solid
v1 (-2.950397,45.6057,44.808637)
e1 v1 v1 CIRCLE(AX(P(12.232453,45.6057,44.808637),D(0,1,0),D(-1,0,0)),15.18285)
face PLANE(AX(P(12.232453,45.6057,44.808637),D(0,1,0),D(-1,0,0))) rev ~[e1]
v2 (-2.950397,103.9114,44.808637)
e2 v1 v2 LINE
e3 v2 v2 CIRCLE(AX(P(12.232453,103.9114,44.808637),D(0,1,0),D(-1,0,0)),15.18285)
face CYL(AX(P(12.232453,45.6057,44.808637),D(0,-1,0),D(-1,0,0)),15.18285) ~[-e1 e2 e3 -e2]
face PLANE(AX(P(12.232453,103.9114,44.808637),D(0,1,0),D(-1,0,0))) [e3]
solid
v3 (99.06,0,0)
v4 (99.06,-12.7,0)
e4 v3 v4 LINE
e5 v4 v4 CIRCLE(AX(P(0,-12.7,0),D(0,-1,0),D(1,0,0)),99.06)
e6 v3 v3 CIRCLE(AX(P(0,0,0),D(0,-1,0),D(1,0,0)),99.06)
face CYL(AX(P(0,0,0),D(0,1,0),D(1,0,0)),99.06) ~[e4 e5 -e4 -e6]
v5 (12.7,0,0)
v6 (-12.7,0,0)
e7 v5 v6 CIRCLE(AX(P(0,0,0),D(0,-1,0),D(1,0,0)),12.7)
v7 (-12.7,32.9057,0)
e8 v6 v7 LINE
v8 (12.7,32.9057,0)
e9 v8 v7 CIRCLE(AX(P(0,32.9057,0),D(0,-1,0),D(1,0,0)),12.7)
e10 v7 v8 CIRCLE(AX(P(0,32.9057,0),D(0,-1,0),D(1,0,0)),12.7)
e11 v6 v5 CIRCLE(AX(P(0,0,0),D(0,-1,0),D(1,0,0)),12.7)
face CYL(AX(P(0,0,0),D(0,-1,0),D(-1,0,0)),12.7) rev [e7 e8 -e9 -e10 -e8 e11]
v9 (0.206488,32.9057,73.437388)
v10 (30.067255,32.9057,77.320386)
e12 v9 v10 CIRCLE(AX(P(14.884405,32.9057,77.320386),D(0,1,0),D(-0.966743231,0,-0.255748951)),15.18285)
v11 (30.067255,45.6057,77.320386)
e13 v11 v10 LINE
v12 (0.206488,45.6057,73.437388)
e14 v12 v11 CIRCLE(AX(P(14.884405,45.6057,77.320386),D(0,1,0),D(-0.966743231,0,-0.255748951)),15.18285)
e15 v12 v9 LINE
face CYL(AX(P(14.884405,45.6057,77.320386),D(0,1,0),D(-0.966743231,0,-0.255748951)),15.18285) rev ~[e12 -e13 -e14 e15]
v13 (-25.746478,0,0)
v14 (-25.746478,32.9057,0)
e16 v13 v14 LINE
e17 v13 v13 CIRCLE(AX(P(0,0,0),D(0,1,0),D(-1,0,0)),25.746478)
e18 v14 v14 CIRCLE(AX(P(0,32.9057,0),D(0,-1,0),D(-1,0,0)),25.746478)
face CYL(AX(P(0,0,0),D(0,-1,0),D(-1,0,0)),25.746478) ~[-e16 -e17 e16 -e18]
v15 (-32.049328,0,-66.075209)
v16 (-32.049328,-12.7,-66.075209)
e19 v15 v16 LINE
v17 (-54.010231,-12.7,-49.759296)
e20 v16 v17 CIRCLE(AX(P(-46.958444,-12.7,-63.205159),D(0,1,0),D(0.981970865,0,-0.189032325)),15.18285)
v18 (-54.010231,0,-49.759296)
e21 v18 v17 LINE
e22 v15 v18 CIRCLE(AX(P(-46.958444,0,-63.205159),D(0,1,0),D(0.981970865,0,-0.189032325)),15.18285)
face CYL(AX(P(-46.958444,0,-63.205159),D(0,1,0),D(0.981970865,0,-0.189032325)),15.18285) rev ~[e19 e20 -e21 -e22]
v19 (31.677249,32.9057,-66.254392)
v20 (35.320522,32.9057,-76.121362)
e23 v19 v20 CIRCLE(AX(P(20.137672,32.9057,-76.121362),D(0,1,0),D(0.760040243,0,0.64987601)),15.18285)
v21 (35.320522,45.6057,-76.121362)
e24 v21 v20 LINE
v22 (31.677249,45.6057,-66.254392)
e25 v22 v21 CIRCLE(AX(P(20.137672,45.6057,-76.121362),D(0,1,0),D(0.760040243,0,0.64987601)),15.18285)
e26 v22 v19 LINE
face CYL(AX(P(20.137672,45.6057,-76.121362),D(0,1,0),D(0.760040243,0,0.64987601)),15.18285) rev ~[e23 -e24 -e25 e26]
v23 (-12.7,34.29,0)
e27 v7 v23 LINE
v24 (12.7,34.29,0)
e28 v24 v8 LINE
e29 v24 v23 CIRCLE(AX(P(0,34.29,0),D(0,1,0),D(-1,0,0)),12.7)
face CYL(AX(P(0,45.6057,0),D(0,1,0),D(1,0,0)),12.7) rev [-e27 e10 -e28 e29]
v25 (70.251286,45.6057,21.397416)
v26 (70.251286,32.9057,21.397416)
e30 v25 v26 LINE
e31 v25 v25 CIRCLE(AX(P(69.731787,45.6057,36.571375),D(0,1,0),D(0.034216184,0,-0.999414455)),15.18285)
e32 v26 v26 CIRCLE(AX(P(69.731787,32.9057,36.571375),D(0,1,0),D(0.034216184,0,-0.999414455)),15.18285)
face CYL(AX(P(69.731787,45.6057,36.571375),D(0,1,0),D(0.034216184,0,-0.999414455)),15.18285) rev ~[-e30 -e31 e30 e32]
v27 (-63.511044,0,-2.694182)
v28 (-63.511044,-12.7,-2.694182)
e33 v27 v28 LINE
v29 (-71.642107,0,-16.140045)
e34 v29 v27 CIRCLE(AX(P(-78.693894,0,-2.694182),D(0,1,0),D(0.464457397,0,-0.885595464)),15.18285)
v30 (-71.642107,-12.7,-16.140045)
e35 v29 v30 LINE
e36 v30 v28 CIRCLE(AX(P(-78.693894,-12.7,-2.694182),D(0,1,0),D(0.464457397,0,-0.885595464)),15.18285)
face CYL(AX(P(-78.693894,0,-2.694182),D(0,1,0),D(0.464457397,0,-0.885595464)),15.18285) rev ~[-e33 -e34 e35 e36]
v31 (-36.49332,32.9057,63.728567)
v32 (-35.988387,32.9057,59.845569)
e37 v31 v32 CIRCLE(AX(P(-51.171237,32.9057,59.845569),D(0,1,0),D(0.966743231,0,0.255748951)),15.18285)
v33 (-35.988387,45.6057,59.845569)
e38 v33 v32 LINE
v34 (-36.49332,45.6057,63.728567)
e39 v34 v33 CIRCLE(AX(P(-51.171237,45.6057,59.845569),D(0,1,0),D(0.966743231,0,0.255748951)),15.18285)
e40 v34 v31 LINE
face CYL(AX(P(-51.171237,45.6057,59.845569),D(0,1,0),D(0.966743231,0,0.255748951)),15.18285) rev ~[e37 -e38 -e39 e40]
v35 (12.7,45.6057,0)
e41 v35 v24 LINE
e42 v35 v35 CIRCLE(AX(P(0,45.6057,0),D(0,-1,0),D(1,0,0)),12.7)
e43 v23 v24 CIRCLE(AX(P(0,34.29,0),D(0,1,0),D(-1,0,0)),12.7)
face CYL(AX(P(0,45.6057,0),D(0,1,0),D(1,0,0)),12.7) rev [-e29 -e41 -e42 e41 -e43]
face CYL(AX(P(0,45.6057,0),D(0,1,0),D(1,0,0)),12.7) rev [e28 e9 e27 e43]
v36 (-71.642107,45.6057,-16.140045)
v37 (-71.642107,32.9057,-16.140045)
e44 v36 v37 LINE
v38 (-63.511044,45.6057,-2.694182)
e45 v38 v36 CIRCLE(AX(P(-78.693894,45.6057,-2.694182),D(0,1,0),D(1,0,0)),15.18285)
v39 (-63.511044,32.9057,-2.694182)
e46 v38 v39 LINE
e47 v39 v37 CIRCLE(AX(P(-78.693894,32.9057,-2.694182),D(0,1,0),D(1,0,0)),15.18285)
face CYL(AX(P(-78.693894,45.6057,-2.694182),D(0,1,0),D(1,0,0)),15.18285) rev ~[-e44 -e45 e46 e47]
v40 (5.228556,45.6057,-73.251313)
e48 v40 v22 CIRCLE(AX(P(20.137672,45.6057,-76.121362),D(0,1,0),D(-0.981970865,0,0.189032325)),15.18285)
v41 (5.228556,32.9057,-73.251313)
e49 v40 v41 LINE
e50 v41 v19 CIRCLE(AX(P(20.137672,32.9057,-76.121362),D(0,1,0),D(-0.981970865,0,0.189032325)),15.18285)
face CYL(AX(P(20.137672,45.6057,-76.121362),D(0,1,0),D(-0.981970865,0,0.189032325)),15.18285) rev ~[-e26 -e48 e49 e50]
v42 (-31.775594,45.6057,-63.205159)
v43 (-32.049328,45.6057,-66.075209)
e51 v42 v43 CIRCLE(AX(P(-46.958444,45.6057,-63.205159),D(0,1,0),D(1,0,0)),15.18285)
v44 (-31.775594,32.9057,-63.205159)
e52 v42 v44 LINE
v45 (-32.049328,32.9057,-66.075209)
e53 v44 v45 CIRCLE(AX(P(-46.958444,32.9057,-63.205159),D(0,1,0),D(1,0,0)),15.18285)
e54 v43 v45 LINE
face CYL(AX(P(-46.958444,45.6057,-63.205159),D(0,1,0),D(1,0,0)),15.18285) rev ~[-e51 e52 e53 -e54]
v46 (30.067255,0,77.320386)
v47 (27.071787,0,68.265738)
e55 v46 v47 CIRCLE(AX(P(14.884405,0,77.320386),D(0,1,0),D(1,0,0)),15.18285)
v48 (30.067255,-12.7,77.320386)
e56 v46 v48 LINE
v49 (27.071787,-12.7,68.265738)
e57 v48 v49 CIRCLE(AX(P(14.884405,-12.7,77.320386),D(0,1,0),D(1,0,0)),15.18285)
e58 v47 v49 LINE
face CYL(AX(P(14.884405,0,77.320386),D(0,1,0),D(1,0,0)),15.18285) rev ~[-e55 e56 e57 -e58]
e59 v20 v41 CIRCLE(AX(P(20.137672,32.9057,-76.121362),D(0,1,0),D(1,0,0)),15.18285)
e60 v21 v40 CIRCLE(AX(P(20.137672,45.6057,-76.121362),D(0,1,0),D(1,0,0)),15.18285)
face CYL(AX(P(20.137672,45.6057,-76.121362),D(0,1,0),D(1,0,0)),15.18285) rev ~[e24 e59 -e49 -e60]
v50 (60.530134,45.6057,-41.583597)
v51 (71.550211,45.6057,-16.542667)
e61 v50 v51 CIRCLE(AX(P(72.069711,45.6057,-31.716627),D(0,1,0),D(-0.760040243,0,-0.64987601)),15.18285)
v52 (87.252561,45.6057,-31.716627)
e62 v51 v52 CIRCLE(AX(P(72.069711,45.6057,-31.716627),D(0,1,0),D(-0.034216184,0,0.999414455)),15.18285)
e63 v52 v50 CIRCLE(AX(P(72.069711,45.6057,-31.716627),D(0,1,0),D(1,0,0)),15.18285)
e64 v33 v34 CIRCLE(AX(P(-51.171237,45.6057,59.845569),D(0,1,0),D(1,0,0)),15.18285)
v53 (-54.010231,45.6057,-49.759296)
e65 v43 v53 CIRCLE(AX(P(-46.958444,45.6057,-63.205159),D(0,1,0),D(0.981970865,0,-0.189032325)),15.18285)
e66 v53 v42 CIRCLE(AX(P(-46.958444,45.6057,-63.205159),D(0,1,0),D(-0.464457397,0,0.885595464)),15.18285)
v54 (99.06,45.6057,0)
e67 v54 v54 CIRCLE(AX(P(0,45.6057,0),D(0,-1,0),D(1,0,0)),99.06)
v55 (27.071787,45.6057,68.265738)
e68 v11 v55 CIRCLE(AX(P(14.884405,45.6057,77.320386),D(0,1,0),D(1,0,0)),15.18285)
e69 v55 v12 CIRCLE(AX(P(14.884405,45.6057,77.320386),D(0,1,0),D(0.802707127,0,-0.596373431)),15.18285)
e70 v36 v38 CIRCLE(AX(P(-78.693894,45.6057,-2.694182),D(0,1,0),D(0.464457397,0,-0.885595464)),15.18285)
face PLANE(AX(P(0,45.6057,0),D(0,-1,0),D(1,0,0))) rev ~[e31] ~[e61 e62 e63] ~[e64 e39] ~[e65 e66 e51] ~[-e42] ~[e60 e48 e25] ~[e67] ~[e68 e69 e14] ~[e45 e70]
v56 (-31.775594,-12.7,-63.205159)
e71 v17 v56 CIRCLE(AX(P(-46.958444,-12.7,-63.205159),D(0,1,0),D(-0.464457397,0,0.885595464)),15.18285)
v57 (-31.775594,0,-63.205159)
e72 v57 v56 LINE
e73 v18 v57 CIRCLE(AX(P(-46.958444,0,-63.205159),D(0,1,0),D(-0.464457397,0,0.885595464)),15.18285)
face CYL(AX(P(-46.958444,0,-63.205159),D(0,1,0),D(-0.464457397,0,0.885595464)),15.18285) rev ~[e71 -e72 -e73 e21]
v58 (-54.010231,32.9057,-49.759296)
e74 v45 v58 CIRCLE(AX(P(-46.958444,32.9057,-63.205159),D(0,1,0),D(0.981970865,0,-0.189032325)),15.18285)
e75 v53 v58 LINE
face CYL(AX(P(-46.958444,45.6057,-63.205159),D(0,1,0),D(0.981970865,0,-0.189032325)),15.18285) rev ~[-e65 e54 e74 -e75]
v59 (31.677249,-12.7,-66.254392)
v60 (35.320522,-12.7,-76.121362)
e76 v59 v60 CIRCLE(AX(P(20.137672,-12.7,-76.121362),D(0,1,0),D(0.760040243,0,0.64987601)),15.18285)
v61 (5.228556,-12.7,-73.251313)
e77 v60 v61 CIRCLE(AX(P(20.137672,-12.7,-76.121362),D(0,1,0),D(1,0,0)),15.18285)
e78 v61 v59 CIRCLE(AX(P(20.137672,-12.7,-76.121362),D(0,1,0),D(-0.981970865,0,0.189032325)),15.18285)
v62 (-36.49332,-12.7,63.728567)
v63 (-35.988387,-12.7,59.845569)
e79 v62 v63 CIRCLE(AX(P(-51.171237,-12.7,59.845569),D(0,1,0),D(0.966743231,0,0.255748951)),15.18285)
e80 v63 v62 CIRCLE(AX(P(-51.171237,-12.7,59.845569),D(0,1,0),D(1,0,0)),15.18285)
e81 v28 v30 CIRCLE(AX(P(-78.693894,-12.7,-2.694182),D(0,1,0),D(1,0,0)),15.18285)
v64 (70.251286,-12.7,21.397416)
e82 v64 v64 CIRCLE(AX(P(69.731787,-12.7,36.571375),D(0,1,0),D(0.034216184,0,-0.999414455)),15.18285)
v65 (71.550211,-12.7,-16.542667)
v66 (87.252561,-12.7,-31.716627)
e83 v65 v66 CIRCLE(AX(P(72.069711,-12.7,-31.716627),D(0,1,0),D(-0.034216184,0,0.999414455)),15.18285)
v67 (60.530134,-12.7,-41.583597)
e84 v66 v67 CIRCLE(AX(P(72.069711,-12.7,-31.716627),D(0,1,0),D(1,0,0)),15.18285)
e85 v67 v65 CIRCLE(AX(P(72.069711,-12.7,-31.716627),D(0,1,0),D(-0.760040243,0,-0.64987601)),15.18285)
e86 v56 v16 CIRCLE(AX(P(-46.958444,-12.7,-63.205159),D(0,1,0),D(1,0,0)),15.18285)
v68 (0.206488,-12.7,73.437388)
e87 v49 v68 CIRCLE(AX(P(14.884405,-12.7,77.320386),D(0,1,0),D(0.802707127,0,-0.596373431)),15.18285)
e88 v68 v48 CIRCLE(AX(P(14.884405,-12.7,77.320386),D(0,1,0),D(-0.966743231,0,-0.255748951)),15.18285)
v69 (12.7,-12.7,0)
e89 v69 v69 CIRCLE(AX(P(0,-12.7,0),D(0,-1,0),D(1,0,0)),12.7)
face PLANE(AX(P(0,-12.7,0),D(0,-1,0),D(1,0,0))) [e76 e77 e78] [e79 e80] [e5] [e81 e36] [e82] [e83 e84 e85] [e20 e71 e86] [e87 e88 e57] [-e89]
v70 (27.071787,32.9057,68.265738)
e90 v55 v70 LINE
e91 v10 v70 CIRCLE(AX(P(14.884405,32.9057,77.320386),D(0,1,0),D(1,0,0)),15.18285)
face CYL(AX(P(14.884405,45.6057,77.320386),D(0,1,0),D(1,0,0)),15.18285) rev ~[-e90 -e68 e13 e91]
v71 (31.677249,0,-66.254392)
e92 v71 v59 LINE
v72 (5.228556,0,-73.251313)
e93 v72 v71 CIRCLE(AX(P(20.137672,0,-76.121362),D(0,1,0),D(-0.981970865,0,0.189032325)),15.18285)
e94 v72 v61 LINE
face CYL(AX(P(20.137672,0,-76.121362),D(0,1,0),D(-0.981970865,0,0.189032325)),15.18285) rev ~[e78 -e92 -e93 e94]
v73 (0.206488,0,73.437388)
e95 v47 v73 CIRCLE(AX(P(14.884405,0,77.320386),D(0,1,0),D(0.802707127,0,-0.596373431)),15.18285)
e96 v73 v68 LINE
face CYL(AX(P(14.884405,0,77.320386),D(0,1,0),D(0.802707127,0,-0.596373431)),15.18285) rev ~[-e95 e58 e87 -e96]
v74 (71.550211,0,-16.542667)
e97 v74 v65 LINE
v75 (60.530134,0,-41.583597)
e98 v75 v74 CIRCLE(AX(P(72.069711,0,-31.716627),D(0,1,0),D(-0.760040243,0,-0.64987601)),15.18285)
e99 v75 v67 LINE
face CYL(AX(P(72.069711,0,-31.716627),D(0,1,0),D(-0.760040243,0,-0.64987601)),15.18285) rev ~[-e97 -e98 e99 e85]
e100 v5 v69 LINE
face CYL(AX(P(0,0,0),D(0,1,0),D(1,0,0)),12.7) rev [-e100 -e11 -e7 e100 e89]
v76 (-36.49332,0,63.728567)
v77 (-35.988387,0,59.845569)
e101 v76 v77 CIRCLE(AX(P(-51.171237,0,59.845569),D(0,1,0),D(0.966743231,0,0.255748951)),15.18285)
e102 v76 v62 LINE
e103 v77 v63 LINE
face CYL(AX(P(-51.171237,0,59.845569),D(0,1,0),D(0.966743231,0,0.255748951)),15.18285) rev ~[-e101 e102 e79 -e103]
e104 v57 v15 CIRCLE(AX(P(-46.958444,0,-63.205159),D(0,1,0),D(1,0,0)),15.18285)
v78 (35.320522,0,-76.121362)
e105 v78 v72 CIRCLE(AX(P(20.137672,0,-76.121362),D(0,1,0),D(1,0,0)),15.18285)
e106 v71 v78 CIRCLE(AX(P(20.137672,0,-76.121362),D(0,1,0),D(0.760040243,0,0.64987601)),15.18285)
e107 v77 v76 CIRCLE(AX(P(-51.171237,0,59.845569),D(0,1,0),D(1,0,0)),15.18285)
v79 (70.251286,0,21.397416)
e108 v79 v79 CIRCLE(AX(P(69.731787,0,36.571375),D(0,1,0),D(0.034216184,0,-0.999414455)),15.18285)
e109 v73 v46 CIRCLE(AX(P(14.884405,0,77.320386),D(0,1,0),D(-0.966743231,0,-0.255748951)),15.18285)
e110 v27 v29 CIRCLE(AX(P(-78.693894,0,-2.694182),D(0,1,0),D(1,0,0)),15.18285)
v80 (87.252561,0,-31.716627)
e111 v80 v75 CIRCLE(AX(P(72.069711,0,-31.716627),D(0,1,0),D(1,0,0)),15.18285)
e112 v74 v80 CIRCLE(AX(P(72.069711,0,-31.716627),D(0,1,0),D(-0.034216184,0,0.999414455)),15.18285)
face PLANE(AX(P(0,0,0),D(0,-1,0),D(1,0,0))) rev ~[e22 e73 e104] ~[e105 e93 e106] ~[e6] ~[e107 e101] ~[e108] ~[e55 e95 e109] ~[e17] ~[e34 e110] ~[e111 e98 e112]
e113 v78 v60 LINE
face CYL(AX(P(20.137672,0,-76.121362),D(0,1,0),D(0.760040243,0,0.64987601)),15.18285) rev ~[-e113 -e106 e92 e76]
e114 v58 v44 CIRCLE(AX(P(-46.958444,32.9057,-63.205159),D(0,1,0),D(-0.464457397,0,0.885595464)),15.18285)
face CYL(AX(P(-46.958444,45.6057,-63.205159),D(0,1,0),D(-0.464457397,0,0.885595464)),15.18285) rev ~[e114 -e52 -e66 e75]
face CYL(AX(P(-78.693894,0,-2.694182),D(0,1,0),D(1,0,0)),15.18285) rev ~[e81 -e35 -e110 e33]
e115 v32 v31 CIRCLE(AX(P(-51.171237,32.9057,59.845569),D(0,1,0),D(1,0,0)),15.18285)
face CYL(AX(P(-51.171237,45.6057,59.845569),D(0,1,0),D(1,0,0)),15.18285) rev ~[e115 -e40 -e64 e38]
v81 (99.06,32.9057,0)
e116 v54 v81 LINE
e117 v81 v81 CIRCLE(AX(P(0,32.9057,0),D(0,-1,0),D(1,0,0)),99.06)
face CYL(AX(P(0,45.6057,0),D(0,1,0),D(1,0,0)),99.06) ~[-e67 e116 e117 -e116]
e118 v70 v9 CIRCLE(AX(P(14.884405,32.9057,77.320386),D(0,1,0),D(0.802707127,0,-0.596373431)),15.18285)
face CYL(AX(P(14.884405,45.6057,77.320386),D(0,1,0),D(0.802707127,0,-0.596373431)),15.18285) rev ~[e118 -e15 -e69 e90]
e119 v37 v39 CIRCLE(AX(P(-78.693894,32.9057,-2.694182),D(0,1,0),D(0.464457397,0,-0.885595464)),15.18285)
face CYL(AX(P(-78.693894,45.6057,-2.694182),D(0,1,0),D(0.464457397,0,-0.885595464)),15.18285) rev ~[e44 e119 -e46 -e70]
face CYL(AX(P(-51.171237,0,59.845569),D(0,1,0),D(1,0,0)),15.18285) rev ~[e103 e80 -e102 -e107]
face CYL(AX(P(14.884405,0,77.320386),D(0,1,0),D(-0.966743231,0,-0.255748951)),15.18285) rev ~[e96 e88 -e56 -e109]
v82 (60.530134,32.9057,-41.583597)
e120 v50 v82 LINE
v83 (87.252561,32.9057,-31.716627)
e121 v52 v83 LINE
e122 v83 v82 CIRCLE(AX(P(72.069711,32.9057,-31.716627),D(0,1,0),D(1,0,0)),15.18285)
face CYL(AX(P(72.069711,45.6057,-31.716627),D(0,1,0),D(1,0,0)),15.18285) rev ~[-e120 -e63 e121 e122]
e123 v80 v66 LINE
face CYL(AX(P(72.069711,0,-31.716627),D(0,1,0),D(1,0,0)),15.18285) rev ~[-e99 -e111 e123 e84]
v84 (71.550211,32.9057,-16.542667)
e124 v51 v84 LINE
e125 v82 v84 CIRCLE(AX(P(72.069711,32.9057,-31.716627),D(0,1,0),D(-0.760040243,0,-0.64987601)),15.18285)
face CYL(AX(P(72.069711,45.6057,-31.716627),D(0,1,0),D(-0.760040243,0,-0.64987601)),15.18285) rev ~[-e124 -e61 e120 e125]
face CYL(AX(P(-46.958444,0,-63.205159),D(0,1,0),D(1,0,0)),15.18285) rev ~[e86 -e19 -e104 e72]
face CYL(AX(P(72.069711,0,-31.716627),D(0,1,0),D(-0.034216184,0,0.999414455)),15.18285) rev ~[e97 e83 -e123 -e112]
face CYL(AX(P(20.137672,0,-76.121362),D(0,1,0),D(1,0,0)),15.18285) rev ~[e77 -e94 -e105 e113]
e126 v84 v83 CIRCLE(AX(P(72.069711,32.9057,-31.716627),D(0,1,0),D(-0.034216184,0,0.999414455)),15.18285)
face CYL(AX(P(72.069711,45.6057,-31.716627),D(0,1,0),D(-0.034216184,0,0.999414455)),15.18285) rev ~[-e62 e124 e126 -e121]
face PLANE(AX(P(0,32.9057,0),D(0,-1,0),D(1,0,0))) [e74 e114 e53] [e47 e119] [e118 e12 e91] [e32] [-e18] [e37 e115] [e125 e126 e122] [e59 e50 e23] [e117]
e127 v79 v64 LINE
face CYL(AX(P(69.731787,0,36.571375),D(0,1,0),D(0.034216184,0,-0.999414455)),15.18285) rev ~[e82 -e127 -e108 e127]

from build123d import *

# Parameters (mm, degrees)
F0_R     = 99.06
F0_R_2   = 12.7
F1_DEPTH = 12.7
F4_R     = 25.7464776051
F4_R_2   = 12.7
F5_DEPTH = 34.29
F6_R     = 15.18285
F7_DEPTH = 58.3057


with BuildPart() as f1:
    # F0 (on Front) → F1 (new body)
    with BuildSketch(Plane.XZ):
        Circle(F0_R)
        with BuildLine():
            ThreePointArc((87.2525606561, -31.7166266483), (77.3287632035, -45.9595652645), (60.5301336512, -41.5835966325))
            Line((60.5301336512, -41.5835966325), (31.6772493906, -66.2543920036))
            ThreePointArc((31.6772493906, -66.2543920036), (34.3806110019, -70.8623094404), (35.3205223857, -76.1213619879))
            ThreePointArc((35.3205223857, -76.1213619879), (18.6961355427, -91.235623652), (5.2285560351, -73.2513125515))
            Line((5.2285560351, -73.2513125515), (-32.0493275742, -66.0752085942))
            ThreePointArc((-32.0493275742, -66.0752085942), (-56.0130922655, -75.3925410567), (-54.0102309185, -49.7592960647))
            Line((-54.0102309185, -49.7592960647), (-71.6421071885, -16.1400454247))
            ThreePointArc((-71.6421071885, -16.1400454247), (-93.8678539395, -3.2136815215), (-72.5782123825, 11.2024852635))
            Line((-72.5782123825, 11.2024852635), (-57.2869188572, 45.9489011465))
            ThreePointArc((-57.2869188572, 45.9489011465), (-61.0382070418, 71.3851457465), (-36.4933195968, 63.7285666992))
            Line((-36.4933195968, 63.7285666992), (0.2064878138, 73.4373879676))
            ThreePointArc((0.2064878138, 73.4373879676), (12.9265601576, 92.3764736183), (30.0672552745, 77.3203859252))
            ThreePointArc((30.0672552745, 77.3203859252), (29.2989487183, 72.551751799), (27.0717871734, 68.2657375846))
            Line((27.0717871734, 68.2657375846), (57.5444049494, 45.6260237994))
            ThreePointArc((57.5444049494, 45.6260237994), (74.5004209745, 50.9859189025), (84.9146368483, 36.5713754587))
            ThreePointArc((84.9146368483, 36.5713754587), (80.649808931, 26.0207485615), (70.2512860382, 21.3974157015))
            Line((70.2512860382, 21.3974157015), (71.5502114662, -16.5426668911))
            ThreePointArc((71.5502114662, -16.5426668911), (82.6203375533, -20.7986045656), (87.2525606561, -31.7166266483))
        make_face(mode=Mode.SUBTRACT)
        with BuildLine():
            Line((31.6772493906, -66.2543920036), (60.5301336512, -41.5835966325))
            ThreePointArc((60.5301336512, -41.5835966325), (58.173043061, -25.6009448486), (71.5502114662, -16.5426668911))
            Line((71.5502114662, -16.5426668911), (70.2512860382, 21.3974157015))
            ThreePointArc((70.2512860382, 21.3974157015), (56.2859237552, 29.519588465), (57.5444049494, 45.6260237994))
            Line((57.5444049494, 45.6260237994), (27.0717871734, 68.2657375846))
            ThreePointArc((27.0717871734, 68.2657375846), (12.0143558381, 62.4112695746), (0.2064878138, 73.4373879676))
            Line((0.2064878138, 73.4373879676), (-36.4933195968, 63.7285666992))
            ThreePointArc((-36.4933195968, 63.7285666992), (-36.1151493645, 61.8034138585), (-35.9883870575, 59.8455687416))
            ThreePointArc((-35.9883870575, 59.8455687416), (-42.8746879342, 47.1299796177), (-57.2869188572, 45.9489011465))
            Line((-57.2869188572, 45.9489011465), (-72.5782123825, 11.2024852635))
            ThreePointArc((-72.5782123825, 11.2024852635), (-65.9783050583, 5.6023667917), (-63.5110441822, -2.6941823316))
            ThreePointArc((-63.5110441822, -2.6941823316), (-65.701874357, -10.5507945139), (-71.6421071885, -16.1400454247))
            Line((-71.6421071885, -16.1400454247), (-54.0102309185, -49.7592960647))
            ThreePointArc((-54.0102309185, -49.7592960647), (-39.1018317425, -50.2131393325), (-31.7755939248, -63.2051591578))
            ThreePointArc((-31.7755939248, -63.2051591578), (-31.8441822607, -64.6466960007), (-32.0493275742, -66.0752085942))
            Line((-32.0493275742, -66.0752085942), (5.2285560351, -73.2513125515))
            ThreePointArc((5.2285560351, -73.2513125515), (16.2546744281, -61.4434445271), (31.6772493906, -66.2543920036))
        make_face()
        Circle(F0_R_2, mode=Mode.SUBTRACT)
    extrude(amount=F1_DEPTH)


with BuildPart() as f2_1:
    # F2: copy of F1
    add(f1.part.moved(Location((0, 30.3657, 0))))


with BuildPart() as f2_1_1:
    # F3: moved
    add(f2_1.part.moved(Location((0, 15.24, 0))))


with BuildPart() as f1_1:
    add(f1.part)

    add(f2_1_1.part)  # F5 merges F2_1
    # F4 (on face) → F5 (join)
    with BuildSketch(Plane(origin=(0, 0, 0), x_dir=(-1, 0, 0), z_dir=(0, 1, 0))):
        Circle(F4_R)
        Circle(F4_R_2, mode=Mode.SUBTRACT)
    extrude(amount=F5_DEPTH)


with BuildPart() as f7:
    # F6 (on face) → F7 (new body)
    with BuildSketch(Plane(origin=(0, 45.6057, 0), x_dir=(-1, 0, 0), z_dir=(0, 1, 0))):
        with Locations((-12.232452631, 44.8086373508)):
            Circle(F6_R)
    extrude(amount=F7_DEPTH)


solid = Compound([f1_1.part, f7.part])
